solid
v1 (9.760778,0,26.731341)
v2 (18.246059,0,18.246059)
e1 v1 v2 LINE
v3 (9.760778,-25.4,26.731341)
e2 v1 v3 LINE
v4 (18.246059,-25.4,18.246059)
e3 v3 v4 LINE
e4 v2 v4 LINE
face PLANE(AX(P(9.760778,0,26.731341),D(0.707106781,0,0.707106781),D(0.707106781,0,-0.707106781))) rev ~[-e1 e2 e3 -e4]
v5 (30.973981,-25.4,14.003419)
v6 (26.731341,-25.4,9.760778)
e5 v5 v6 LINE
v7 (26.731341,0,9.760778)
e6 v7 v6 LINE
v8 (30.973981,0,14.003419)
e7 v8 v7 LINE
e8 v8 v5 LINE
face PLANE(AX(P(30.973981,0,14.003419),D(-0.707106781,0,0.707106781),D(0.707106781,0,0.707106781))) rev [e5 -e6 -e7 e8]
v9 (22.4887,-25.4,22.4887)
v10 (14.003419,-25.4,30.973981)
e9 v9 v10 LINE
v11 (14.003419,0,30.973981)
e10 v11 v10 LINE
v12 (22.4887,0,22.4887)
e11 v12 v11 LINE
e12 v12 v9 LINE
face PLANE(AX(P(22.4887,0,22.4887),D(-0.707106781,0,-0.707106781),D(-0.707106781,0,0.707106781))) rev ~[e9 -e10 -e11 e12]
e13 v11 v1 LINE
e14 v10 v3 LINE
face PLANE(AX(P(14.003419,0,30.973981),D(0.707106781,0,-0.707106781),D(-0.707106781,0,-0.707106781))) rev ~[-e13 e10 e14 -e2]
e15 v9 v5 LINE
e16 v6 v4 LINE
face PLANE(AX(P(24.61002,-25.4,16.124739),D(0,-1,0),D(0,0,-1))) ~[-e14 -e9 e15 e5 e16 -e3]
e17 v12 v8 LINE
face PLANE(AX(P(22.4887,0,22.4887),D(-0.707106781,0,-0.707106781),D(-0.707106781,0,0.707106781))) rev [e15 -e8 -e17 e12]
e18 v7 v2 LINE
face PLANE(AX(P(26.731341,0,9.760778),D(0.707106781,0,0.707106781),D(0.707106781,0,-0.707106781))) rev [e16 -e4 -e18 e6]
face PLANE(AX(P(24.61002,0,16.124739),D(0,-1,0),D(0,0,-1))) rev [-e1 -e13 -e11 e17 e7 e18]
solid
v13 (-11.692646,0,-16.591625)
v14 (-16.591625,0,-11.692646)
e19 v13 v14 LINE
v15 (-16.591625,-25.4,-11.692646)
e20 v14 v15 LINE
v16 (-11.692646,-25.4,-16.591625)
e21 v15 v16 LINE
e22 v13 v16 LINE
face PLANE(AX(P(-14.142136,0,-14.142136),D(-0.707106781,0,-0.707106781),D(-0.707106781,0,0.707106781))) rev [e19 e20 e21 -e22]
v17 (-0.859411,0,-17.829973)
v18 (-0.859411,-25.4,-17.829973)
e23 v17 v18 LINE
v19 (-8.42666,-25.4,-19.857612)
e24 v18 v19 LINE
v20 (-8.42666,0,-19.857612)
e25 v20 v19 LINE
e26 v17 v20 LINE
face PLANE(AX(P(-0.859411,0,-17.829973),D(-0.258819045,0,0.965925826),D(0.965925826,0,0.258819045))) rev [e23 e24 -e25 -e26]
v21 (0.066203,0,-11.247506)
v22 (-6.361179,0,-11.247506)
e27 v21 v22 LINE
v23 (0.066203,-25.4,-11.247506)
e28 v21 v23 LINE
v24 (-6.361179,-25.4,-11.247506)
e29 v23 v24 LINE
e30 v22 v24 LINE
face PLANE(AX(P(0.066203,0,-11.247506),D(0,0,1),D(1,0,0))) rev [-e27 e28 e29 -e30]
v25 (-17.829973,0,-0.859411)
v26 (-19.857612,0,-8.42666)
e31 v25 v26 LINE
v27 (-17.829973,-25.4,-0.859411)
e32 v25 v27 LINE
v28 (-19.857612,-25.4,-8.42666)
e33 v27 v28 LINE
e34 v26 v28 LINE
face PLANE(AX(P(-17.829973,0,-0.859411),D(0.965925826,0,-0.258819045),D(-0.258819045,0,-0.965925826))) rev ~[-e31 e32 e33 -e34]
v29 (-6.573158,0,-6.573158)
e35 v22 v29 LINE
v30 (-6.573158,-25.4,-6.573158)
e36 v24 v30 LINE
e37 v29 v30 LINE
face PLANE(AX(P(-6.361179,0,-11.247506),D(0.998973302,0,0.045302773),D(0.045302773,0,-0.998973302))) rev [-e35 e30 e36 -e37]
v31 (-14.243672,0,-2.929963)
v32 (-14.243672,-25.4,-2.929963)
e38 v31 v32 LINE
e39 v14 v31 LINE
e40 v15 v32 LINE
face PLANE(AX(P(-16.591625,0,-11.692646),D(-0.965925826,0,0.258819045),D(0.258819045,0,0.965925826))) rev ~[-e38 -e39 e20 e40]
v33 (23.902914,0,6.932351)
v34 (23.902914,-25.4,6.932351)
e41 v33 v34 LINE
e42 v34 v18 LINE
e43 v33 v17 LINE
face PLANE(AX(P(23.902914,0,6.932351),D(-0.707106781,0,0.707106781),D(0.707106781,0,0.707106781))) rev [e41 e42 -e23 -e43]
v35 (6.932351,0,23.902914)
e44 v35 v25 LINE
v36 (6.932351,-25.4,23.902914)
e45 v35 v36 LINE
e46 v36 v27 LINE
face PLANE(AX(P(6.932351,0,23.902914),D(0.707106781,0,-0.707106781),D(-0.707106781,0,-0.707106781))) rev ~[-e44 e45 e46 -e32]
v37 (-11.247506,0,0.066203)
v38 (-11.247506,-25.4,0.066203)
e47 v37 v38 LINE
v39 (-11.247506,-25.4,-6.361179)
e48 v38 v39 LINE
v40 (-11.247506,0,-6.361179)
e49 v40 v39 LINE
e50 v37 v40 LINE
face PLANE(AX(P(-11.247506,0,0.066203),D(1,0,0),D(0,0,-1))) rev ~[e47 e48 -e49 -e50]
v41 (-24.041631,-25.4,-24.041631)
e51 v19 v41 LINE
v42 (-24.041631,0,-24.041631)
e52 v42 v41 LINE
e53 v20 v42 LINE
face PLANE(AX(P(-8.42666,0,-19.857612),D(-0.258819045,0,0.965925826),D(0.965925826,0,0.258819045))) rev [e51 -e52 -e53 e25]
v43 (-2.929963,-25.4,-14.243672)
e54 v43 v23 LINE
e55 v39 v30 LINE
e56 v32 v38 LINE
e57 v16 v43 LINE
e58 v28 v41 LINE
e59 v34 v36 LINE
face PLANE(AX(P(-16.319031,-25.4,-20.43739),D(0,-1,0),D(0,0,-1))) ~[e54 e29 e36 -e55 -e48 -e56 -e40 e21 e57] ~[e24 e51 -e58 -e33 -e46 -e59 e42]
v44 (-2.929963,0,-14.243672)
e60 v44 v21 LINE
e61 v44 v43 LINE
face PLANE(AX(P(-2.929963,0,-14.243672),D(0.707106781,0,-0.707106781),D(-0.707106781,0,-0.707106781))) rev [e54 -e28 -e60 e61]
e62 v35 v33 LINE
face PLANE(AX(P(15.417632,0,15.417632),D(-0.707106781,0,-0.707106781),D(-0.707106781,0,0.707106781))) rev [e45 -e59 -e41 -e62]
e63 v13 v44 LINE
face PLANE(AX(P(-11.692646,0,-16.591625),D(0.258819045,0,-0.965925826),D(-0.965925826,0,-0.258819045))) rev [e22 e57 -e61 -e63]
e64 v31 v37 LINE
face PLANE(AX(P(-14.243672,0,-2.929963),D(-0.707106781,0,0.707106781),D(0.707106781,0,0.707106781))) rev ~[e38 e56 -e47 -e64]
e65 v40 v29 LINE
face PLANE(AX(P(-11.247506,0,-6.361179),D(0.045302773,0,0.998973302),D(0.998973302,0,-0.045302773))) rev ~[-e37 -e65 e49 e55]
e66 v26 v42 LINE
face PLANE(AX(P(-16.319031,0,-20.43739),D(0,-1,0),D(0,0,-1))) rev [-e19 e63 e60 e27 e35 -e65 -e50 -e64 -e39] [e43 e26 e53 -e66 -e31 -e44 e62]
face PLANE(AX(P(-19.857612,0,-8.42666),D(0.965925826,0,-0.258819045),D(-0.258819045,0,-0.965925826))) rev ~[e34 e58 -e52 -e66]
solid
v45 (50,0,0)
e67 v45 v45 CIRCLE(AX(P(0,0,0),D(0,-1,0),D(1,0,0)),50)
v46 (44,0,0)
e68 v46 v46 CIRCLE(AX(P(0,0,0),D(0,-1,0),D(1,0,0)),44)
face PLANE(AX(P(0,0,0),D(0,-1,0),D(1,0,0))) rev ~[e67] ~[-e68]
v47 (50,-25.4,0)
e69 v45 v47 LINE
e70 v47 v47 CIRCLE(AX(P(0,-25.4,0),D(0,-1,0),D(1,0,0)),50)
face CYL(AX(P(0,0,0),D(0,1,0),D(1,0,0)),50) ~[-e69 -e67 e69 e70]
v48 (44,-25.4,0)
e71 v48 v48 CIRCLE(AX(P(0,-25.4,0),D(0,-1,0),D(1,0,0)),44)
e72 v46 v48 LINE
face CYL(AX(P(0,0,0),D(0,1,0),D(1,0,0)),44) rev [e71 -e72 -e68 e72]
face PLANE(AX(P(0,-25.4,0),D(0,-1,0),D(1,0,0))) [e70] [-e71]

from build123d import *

# Parameters (mm, degrees)
F0_R     = 50
F0_R_2   = 44
F1_DEPTH = 25.4
F2_DEPTH = 25.4


# Not quite as in the source:
# - a feature names something its author has since deleted; it is built from what else it names


with BuildPart() as f1:
    # F0 (on Front) → F1 (new body)
    with BuildSketch(Plane.XZ):
        Circle(F0_R)
        Circle(F0_R_2, mode=Mode.SUBTRACT)
    extrude(amount=F1_DEPTH)


with BuildPart() as f2:
    # F0 (on Front) → F2 (new body)
    with BuildSketch(Plane.XZ):
        Polygon((-24.0416305603, -24.0416305603), (-18.3847763109, -18.3847763109), (-16.5916253665, -11.6926458809), (-19.8576116902, -8.4266595572), align=None)
        Polygon((-18.3847763109, -18.3847763109), (-14.1421356237, -14.1421356237), (-16.5916253665, -11.6926458809), align=None)
        Polygon((-11.2475056175, 0.0662028815), (9.7607779651, 21.0744864641), (6.9323508404, 23.9029135888), (-17.8299734779, -0.8594107294), (-19.8576116902, -8.4266595572), (-16.5916253665, -11.6926458809), (-14.2436715892, -2.9299630902), align=None)
        Polygon((-6.5731576178, -6.5731576178), (0, 0), (15.4176322146, 15.4176322146), (9.7607779651, 21.0744864641), (-11.2475056175, 0.0662028815), (-11.2475056175, -6.3611790538), align=None)
    extrude(amount=F2_DEPTH)

    # F3: F2 across face


with BuildPart() as f2b:
    # F0 (on Front) → F2, piece 2 (new body)
    with BuildSketch(Plane.XZ):
        Polygon((14.0034186522, 30.9739814007), (9.7607779651, 26.7313407136), (18.2460593393, 18.2460593393), (22.4887000265, 22.4887000265), align=None)
    extrude(amount=F2_DEPTH)

    # F4: F2b across face


with BuildPart() as f2_1:
    add(f2.part)
    add(f2.part.mirror(Plane(origin=(4.4222372984, -12.7, 4.4222372984), x_dir=(0, 1, 0), z_dir=(0.7071067812, 0, -0.7071067812))))


with BuildPart() as f2b_1:
    add(f2b.part)
    add(f2b.part.mirror(Plane(origin=(20.3673796829, -12.7, 20.3673796829), x_dir=(0, 1, 0), z_dir=(0.7071067812, 0, -0.7071067812))))


solid = Compound([f1.part, f2_1.part, f2b_1.part])
